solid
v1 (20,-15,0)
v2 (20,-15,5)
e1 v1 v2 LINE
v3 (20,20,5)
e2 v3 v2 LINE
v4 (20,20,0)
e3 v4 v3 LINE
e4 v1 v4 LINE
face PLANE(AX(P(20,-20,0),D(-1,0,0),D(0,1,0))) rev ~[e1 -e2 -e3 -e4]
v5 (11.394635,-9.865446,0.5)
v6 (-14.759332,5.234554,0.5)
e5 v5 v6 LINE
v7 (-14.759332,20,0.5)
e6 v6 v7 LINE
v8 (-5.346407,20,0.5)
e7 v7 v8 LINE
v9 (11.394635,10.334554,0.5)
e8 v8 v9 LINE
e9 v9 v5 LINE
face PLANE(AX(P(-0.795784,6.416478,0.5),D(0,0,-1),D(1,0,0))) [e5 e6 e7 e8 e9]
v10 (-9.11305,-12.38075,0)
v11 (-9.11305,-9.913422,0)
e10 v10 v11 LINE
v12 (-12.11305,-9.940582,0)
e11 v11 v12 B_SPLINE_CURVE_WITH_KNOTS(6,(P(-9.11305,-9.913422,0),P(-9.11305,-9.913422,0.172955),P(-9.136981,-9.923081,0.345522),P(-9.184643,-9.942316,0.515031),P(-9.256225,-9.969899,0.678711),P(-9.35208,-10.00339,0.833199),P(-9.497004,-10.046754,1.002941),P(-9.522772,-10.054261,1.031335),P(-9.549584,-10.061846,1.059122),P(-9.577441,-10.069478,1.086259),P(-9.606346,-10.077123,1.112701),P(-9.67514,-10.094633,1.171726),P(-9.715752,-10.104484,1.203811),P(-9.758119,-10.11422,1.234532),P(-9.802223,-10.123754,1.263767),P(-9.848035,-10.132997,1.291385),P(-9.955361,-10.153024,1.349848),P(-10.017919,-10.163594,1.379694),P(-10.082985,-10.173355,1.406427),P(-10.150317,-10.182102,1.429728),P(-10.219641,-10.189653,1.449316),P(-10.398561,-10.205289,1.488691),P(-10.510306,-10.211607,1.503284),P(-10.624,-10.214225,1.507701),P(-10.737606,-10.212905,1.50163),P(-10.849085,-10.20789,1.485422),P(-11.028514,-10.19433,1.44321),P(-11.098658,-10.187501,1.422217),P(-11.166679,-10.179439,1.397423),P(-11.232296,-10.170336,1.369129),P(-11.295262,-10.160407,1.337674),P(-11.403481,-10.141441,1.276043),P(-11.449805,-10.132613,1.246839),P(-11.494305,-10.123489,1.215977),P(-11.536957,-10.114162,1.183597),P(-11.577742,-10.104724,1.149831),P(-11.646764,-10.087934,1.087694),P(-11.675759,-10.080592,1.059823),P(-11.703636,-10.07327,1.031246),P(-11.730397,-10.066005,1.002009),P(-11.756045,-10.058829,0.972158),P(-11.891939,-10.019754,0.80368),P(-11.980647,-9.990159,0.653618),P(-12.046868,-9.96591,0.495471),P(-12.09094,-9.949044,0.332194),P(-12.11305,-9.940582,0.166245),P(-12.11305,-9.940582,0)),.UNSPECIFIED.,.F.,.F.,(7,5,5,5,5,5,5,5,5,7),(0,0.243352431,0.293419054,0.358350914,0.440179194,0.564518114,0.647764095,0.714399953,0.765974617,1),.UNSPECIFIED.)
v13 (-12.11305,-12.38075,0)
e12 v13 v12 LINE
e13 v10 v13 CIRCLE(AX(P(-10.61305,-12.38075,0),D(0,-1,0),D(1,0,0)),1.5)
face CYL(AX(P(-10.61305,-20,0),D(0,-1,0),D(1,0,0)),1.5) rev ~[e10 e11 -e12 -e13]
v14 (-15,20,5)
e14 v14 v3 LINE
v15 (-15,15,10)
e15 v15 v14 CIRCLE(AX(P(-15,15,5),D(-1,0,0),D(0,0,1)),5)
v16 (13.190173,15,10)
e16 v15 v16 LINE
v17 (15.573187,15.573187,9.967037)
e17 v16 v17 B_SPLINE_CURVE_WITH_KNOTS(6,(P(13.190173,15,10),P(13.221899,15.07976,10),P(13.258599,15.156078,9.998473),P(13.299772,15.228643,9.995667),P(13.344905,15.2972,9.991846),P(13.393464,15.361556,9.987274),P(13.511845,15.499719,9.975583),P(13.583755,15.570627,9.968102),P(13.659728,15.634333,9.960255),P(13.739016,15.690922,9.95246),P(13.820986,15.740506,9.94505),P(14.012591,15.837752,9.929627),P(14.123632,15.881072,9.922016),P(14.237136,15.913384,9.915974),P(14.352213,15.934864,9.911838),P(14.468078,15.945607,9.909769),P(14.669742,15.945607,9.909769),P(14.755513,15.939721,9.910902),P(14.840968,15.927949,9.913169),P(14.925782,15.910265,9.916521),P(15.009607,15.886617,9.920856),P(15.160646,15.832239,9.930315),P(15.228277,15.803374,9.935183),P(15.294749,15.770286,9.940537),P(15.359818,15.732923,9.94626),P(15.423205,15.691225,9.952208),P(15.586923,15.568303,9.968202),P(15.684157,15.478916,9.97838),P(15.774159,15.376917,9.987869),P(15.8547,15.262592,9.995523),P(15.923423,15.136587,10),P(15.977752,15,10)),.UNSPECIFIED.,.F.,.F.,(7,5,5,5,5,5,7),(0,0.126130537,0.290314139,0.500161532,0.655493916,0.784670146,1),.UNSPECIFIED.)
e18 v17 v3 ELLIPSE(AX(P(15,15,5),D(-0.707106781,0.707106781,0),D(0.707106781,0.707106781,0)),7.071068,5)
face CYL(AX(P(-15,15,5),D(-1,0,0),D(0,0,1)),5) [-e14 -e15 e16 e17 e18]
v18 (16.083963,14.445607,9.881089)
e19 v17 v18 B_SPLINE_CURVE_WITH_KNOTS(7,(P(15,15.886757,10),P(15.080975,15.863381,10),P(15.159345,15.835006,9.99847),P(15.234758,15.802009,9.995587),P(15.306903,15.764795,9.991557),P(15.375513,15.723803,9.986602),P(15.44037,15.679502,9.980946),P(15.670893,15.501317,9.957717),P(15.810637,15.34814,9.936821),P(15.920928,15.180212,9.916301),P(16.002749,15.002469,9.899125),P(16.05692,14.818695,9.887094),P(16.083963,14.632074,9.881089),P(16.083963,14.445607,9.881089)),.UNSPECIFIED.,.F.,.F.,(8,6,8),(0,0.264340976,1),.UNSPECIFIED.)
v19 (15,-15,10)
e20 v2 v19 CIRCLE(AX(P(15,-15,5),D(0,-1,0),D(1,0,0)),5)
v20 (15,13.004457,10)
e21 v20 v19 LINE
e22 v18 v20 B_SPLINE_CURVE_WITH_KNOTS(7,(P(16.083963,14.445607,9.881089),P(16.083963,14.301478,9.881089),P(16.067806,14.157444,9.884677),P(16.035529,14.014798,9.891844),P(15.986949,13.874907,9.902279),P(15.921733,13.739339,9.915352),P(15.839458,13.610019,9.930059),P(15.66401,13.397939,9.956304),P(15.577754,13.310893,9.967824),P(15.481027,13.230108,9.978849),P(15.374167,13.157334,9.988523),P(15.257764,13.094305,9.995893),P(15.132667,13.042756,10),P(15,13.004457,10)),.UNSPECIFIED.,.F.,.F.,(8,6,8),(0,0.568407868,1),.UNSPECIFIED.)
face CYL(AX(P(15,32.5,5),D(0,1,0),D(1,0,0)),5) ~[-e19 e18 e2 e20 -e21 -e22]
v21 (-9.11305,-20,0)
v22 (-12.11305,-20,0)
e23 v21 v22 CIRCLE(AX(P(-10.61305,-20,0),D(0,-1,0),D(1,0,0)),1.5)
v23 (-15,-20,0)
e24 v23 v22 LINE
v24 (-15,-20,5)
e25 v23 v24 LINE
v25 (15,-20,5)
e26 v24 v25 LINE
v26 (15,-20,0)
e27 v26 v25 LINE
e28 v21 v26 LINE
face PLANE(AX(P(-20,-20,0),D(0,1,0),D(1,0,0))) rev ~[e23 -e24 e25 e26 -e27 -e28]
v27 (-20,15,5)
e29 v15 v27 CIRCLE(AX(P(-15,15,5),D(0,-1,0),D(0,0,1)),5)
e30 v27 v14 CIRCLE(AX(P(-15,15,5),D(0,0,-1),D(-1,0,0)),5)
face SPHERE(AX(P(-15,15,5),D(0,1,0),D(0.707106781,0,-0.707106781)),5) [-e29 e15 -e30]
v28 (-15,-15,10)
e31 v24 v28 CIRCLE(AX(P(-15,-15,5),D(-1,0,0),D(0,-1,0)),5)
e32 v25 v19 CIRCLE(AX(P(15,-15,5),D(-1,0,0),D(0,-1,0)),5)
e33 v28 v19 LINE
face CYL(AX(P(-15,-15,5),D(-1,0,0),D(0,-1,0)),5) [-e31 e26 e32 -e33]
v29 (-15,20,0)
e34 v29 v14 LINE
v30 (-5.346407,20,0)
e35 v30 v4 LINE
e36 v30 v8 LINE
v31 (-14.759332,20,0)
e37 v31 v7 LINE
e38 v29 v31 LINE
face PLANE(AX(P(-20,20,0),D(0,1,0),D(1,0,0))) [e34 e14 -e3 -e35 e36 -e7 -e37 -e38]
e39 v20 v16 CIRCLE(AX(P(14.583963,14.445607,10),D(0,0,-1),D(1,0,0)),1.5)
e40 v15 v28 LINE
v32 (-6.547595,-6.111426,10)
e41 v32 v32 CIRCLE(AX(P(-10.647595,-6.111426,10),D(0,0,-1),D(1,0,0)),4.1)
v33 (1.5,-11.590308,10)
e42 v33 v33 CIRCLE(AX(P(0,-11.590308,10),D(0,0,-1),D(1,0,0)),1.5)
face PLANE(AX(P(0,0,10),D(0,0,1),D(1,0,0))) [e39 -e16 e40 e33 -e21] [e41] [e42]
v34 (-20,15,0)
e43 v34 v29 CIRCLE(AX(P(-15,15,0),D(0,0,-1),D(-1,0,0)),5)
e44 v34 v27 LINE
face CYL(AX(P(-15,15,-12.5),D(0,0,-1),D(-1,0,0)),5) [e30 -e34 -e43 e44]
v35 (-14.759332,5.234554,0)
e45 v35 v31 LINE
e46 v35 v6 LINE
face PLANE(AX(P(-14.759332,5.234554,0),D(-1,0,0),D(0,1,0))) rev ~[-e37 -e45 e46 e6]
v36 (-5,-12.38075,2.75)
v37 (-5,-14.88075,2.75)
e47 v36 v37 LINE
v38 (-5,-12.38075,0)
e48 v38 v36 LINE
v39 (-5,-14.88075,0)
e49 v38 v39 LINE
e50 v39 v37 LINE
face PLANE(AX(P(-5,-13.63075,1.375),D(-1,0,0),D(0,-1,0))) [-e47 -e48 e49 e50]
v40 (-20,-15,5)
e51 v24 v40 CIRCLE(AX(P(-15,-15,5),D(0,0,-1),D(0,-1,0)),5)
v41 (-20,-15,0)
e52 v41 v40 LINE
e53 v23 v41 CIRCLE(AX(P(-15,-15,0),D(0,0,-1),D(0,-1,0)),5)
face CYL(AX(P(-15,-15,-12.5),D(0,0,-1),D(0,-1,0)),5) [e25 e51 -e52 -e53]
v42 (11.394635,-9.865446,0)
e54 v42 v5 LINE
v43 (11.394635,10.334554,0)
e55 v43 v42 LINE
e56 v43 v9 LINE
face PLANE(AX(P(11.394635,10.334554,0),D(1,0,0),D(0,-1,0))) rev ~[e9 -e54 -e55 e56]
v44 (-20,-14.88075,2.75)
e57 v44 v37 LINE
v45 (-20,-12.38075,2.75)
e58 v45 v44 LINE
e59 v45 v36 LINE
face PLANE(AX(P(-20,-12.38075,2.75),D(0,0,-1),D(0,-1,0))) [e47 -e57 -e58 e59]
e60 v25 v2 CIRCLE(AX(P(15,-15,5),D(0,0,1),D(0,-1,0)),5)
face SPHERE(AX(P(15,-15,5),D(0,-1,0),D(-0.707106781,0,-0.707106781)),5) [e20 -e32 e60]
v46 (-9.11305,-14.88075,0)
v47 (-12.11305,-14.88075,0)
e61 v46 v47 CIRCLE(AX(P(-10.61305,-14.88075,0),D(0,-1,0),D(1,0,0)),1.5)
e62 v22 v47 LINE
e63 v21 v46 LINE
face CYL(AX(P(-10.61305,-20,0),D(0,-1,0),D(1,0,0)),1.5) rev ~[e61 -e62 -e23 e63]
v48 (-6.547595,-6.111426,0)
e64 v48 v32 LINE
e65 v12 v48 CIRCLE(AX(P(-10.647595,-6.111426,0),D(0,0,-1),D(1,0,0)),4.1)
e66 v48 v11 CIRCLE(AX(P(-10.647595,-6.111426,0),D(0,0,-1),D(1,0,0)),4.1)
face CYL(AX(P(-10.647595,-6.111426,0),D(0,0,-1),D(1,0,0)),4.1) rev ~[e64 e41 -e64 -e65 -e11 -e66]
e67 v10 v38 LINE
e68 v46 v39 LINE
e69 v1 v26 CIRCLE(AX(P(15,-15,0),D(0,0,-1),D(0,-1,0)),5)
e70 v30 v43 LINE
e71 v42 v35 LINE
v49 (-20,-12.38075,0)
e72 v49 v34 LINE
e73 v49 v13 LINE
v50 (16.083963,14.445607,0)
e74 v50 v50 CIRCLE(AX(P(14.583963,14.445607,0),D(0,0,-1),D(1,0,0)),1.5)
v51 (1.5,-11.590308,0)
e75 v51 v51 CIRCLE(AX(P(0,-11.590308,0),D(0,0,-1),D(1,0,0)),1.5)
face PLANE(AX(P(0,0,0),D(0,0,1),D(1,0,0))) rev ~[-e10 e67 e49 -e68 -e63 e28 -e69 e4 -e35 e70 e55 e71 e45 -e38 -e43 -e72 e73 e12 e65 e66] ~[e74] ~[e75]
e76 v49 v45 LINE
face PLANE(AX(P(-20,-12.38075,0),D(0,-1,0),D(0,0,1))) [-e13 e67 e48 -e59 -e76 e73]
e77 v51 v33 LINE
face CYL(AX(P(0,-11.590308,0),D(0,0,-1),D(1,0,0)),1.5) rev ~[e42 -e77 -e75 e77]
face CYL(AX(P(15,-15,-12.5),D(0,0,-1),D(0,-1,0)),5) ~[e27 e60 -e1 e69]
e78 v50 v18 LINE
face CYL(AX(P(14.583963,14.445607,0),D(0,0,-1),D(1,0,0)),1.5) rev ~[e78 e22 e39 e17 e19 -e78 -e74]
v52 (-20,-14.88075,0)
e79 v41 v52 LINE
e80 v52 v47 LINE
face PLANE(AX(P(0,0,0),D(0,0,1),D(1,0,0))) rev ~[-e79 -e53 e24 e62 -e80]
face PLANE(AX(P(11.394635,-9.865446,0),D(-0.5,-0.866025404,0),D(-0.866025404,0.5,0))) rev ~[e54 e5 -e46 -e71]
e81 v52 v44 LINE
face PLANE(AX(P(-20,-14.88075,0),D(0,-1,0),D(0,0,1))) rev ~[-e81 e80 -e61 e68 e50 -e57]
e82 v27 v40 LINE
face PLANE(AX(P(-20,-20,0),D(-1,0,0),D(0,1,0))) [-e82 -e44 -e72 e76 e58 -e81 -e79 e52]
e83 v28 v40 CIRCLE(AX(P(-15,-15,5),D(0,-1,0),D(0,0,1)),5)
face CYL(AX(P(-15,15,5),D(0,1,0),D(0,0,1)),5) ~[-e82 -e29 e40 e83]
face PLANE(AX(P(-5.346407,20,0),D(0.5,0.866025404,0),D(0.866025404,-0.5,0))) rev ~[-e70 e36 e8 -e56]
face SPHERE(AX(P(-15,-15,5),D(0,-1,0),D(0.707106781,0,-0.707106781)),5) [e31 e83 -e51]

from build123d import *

# Parameters (mm, degrees)
F0_W          = 40
F0_H          = 40
F1_DEPTH      = 10
F3_DEPTH      = 0.5
F4_R          = 4.1
F5_DEPTH      = 10.001
F7_W          = 2.5
F7_H          = 2.75
F8_DEPTH      = 15
F11_REACH     = 43.3551019662
F12_R         = 1.5
F13_DEPTH     = 10.0010001
F14_T1_DEPTH  = 17.5
F14_T3_DEPTH  = 47.5
F14_T5_DEPTH  = 30
F14_T7_DEPTH  = 30
F14_T9_DEPTH  = 47.5
F14_S13_W     = 5
F14_S13_H     = 5
F14_T14_DEPTH = 5
F14_S19_W     = 5
F14_S19_H     = 5
F14_T20_DEPTH = 5
F14_S25_W     = 5
F14_S25_H     = 5
F14_T26_DEPTH = 5


# Not quite as in the source:
# - a fillet or chamfer that OpenCascade refuses, or shapes differently, is made with other operations: its cross-section is extruded or revolved along the edge and cut away or added


with BuildPart() as f1:
    # F0 (on Top) → F1 (new body)
    with BuildSketch(Plane.XY):
        Rectangle(F0_W, F0_H)
    extrude(amount=F1_DEPTH)

    # F2 (on face) → F3 (cut)
    with BuildSketch(Plane(origin=(0, 0, 0), x_dir=(1, 0, 0), z_dir=(0, 0, -1))):
        Polygon((11.3946354911, 9.8654455945), (-14.7593317032, -5.2345544055), (-14.7593317032, -20), (-5.3464073564, -20), (11.3946354911, -10.3345544055), align=None)
    extrude(amount=-F3_DEPTH, mode=Mode.SUBTRACT)

    # F4 (on face) → F5 (cut, through all)
    with BuildSketch(Plane(origin=(0, 0, 0), x_dir=(1, 0, 0), z_dir=(0, 0, -1))):
        with Locations((-10.6475949287, 6.1114258133)):
            Circle(F4_R)
    extrude(amount=-F5_DEPTH, mode=Mode.SUBTRACT)

    # F7 (on face) → F8 (cut)
    with BuildSketch(Plane(origin=(-20, 0, 0), x_dir=(0, -1, 0), z_dir=(-1, 0, 0))):
        with Locations((13.6307496577, 1.375)):
            Rectangle(F7_W, F7_H)
    extrude(amount=-F8_DEPTH, mode=Mode.SUBTRACT)

    f11_end = f1.faces().sort_by_distance((-14.7475949287, -6.1114258133, 5))[0]
    # F10 (on face) → F11 (cut, up to a face of the model that its end follows)
    with BuildSketch(Plane.XZ.offset(20)):
        with BuildLine():
            Line((-12.1130503118, 0), (-9.1130503118, 0))
            ThreePointArc((-9.1130503118, 0), (-10.6130503118, 1.5), (-12.1130503118, 0))
        make_face()
    f11_long = extrude(amount=-F11_REACH, mode=Mode.PRIVATE)
    add(split(f11_long, bisect_by=f11_end, keep=Keep.ALL, mode=Mode.PRIVATE).solids().sort_by_distance((-10.6130503118, -20, 0.6366197724))[0], mode=Mode.SUBTRACT)

    # F12 (on face) → F13 (cut, through all)
    with BuildSketch(Plane(origin=(0, 0, 0), x_dir=(1, 0, 0), z_dir=(0, 0, -1))):
        with Locations((0, 11.5903077688)):
            Circle(F12_R)
        with Locations((14.5839625479, -14.4456071497)):
            Circle(F12_R)
    extrude(amount=-F13_DEPTH, mode=Mode.SUBTRACT)

    # F14: fillet of radius 5 on 7 edges, made by hand

    # F14_s2 → F14_t1 (cut)
    with BuildSketch(Plane.XY.offset(-12.5)):
        with BuildLine():
            ThreePointArc((-15, -20), (-18.5355339059, -18.5355339059), (-20, -15))
            Line((-20, -15), (-20, -20))
            Line((-20, -20), (-15, -20))
        make_face()
        with BuildLine():
            ThreePointArc((-20, 15), (-18.5355339059, 18.5355339059), (-15, 20))
            Line((-15, 20), (-20, 20))
            Line((-20, 20), (-20, 15))
        make_face()
        with BuildLine():
            ThreePointArc((15, -20), (18.5355339059, -18.5355339059), (20, -15))
            Line((20, -15), (20, -20))
            Line((20, -20), (15, -20))
        make_face()
    extrude(amount=F14_T1_DEPTH, mode=Mode.SUBTRACT)

    # F14_s4 → F14_t3 (cut)
    with BuildSketch(Plane.XZ.offset(-32.5)):
        with BuildLine():
            ThreePointArc((20, 5), (18.5355339059, 8.5355339059), (15, 10))
            Line((15, 10), (20, 10))
            Line((20, 10), (20, 5))
        make_face()
    extrude(amount=F14_T3_DEPTH, mode=Mode.SUBTRACT)

    # F14_s6 → F14_t5 (cut)
    with BuildSketch(Plane.YZ.offset(-15)):
        with BuildLine():
            ThreePointArc((-20, 5), (-18.5355339059, 8.5355339059), (-15, 10))
            Line((-15, 10), (-20, 10))
            Line((-20, 10), (-20, 5))
        make_face()
    extrude(amount=F14_T5_DEPTH, mode=Mode.SUBTRACT)

    # F14_s8 → F14_t7 (cut)
    with BuildSketch(Plane.XZ.offset(-15)):
        with BuildLine():
            ThreePointArc((-15, 10), (-18.5355339059, 8.5355339059), (-20, 5))
            Line((-20, 5), (-20, 10))
            Line((-20, 10), (-15, 10))
        make_face()
    extrude(amount=F14_T7_DEPTH, mode=Mode.SUBTRACT)

    # F14_s10 → F14_t9 (cut)
    with BuildSketch(Plane.YZ.offset(-15)):
        with BuildLine():
            ThreePointArc((15, 10), (18.5355339059, 8.5355339059), (20, 5))
            Line((20, 5), (20, 10))
            Line((20, 10), (15, 10))
        make_face()
    extrude(amount=F14_T9_DEPTH, mode=Mode.SUBTRACT)


with BuildPart() as f14_tool12:
    # F14_s13 → F14_t14 (new body)
    with BuildSketch(Plane.XZ.offset(15)):
        with Locations((-17.5, 7.5)):
            Rectangle(F14_S13_W, F14_S13_H)
    extrude(amount=F14_T14_DEPTH)

    # F14_s15 → F14_t16 (revolve, cut)
    with BuildSketch(Plane(origin=(-15, -15, 5), x_dir=(0.7071067812, 0, -0.7071067812), z_dir=(-0.7071067812, 0, -0.7071067812))):
        with BuildLine():
            ThreePointArc((0, -5), (5, 0), (0, 5))
            Line((0, 5), (0, -5))
        make_face()
    revolve(axis=Axis((-15, -15, 5), (0, -1, 0)), mode=Mode.SUBTRACT)


with BuildPart() as f1_1:
    add(f1.part)

    # F14_t11: cut F14_tool12
    add(f14_tool12.part, mode=Mode.SUBTRACT)


with BuildPart() as f14_tool18:
    # F14_s19 → F14_t20 (new body)
    with BuildSketch(Plane.XZ.offset(-15)):
        with Locations((-17.5, 7.5)):
            Rectangle(F14_S19_W, F14_S19_H)
    extrude(amount=-F14_T20_DEPTH)

    # F14_s21 → F14_t22 (revolve, cut)
    with BuildSketch(Plane(origin=(-15, 15, 5), x_dir=(0.7071067812, 0, -0.7071067812), z_dir=(0.7071067812, 0, 0.7071067812))):
        with BuildLine():
            ThreePointArc((0, -5), (5, 0), (0, 5))
            Line((0, 5), (0, -5))
        make_face()
    revolve(axis=Axis((-15, 15, 5), (0, 1, 0)), mode=Mode.SUBTRACT)


with BuildPart() as f1_2:
    add(f1_1.part)

    # F14_t17: cut F14_tool18
    add(f14_tool18.part, mode=Mode.SUBTRACT)


with BuildPart() as f14_tool24:
    # F14_s25 → F14_t26 (new body)
    with BuildSketch(Plane.XZ.offset(15)):
        with Locations((17.5, 7.5)):
            Rectangle(F14_S25_W, F14_S25_H)
    extrude(amount=F14_T26_DEPTH)

    # F14_s27 → F14_t28 (revolve, cut)
    with BuildSketch(Plane(origin=(15, -15, 5), x_dir=(-0.7071067812, 0, -0.7071067812), z_dir=(-0.7071067812, 0, 0.7071067812))):
        with BuildLine():
            ThreePointArc((0, -5), (5, 0), (0, 5))
            Line((0, 5), (0, -5))
        make_face()
    revolve(axis=Axis((15, -15, 5), (0, -1, 0)), mode=Mode.SUBTRACT)


with BuildPart() as f1_3:
    add(f1_2.part)

    # F14_t23: cut F14_tool24
    add(f14_tool24.part, mode=Mode.SUBTRACT)


solid = f1_3.part
